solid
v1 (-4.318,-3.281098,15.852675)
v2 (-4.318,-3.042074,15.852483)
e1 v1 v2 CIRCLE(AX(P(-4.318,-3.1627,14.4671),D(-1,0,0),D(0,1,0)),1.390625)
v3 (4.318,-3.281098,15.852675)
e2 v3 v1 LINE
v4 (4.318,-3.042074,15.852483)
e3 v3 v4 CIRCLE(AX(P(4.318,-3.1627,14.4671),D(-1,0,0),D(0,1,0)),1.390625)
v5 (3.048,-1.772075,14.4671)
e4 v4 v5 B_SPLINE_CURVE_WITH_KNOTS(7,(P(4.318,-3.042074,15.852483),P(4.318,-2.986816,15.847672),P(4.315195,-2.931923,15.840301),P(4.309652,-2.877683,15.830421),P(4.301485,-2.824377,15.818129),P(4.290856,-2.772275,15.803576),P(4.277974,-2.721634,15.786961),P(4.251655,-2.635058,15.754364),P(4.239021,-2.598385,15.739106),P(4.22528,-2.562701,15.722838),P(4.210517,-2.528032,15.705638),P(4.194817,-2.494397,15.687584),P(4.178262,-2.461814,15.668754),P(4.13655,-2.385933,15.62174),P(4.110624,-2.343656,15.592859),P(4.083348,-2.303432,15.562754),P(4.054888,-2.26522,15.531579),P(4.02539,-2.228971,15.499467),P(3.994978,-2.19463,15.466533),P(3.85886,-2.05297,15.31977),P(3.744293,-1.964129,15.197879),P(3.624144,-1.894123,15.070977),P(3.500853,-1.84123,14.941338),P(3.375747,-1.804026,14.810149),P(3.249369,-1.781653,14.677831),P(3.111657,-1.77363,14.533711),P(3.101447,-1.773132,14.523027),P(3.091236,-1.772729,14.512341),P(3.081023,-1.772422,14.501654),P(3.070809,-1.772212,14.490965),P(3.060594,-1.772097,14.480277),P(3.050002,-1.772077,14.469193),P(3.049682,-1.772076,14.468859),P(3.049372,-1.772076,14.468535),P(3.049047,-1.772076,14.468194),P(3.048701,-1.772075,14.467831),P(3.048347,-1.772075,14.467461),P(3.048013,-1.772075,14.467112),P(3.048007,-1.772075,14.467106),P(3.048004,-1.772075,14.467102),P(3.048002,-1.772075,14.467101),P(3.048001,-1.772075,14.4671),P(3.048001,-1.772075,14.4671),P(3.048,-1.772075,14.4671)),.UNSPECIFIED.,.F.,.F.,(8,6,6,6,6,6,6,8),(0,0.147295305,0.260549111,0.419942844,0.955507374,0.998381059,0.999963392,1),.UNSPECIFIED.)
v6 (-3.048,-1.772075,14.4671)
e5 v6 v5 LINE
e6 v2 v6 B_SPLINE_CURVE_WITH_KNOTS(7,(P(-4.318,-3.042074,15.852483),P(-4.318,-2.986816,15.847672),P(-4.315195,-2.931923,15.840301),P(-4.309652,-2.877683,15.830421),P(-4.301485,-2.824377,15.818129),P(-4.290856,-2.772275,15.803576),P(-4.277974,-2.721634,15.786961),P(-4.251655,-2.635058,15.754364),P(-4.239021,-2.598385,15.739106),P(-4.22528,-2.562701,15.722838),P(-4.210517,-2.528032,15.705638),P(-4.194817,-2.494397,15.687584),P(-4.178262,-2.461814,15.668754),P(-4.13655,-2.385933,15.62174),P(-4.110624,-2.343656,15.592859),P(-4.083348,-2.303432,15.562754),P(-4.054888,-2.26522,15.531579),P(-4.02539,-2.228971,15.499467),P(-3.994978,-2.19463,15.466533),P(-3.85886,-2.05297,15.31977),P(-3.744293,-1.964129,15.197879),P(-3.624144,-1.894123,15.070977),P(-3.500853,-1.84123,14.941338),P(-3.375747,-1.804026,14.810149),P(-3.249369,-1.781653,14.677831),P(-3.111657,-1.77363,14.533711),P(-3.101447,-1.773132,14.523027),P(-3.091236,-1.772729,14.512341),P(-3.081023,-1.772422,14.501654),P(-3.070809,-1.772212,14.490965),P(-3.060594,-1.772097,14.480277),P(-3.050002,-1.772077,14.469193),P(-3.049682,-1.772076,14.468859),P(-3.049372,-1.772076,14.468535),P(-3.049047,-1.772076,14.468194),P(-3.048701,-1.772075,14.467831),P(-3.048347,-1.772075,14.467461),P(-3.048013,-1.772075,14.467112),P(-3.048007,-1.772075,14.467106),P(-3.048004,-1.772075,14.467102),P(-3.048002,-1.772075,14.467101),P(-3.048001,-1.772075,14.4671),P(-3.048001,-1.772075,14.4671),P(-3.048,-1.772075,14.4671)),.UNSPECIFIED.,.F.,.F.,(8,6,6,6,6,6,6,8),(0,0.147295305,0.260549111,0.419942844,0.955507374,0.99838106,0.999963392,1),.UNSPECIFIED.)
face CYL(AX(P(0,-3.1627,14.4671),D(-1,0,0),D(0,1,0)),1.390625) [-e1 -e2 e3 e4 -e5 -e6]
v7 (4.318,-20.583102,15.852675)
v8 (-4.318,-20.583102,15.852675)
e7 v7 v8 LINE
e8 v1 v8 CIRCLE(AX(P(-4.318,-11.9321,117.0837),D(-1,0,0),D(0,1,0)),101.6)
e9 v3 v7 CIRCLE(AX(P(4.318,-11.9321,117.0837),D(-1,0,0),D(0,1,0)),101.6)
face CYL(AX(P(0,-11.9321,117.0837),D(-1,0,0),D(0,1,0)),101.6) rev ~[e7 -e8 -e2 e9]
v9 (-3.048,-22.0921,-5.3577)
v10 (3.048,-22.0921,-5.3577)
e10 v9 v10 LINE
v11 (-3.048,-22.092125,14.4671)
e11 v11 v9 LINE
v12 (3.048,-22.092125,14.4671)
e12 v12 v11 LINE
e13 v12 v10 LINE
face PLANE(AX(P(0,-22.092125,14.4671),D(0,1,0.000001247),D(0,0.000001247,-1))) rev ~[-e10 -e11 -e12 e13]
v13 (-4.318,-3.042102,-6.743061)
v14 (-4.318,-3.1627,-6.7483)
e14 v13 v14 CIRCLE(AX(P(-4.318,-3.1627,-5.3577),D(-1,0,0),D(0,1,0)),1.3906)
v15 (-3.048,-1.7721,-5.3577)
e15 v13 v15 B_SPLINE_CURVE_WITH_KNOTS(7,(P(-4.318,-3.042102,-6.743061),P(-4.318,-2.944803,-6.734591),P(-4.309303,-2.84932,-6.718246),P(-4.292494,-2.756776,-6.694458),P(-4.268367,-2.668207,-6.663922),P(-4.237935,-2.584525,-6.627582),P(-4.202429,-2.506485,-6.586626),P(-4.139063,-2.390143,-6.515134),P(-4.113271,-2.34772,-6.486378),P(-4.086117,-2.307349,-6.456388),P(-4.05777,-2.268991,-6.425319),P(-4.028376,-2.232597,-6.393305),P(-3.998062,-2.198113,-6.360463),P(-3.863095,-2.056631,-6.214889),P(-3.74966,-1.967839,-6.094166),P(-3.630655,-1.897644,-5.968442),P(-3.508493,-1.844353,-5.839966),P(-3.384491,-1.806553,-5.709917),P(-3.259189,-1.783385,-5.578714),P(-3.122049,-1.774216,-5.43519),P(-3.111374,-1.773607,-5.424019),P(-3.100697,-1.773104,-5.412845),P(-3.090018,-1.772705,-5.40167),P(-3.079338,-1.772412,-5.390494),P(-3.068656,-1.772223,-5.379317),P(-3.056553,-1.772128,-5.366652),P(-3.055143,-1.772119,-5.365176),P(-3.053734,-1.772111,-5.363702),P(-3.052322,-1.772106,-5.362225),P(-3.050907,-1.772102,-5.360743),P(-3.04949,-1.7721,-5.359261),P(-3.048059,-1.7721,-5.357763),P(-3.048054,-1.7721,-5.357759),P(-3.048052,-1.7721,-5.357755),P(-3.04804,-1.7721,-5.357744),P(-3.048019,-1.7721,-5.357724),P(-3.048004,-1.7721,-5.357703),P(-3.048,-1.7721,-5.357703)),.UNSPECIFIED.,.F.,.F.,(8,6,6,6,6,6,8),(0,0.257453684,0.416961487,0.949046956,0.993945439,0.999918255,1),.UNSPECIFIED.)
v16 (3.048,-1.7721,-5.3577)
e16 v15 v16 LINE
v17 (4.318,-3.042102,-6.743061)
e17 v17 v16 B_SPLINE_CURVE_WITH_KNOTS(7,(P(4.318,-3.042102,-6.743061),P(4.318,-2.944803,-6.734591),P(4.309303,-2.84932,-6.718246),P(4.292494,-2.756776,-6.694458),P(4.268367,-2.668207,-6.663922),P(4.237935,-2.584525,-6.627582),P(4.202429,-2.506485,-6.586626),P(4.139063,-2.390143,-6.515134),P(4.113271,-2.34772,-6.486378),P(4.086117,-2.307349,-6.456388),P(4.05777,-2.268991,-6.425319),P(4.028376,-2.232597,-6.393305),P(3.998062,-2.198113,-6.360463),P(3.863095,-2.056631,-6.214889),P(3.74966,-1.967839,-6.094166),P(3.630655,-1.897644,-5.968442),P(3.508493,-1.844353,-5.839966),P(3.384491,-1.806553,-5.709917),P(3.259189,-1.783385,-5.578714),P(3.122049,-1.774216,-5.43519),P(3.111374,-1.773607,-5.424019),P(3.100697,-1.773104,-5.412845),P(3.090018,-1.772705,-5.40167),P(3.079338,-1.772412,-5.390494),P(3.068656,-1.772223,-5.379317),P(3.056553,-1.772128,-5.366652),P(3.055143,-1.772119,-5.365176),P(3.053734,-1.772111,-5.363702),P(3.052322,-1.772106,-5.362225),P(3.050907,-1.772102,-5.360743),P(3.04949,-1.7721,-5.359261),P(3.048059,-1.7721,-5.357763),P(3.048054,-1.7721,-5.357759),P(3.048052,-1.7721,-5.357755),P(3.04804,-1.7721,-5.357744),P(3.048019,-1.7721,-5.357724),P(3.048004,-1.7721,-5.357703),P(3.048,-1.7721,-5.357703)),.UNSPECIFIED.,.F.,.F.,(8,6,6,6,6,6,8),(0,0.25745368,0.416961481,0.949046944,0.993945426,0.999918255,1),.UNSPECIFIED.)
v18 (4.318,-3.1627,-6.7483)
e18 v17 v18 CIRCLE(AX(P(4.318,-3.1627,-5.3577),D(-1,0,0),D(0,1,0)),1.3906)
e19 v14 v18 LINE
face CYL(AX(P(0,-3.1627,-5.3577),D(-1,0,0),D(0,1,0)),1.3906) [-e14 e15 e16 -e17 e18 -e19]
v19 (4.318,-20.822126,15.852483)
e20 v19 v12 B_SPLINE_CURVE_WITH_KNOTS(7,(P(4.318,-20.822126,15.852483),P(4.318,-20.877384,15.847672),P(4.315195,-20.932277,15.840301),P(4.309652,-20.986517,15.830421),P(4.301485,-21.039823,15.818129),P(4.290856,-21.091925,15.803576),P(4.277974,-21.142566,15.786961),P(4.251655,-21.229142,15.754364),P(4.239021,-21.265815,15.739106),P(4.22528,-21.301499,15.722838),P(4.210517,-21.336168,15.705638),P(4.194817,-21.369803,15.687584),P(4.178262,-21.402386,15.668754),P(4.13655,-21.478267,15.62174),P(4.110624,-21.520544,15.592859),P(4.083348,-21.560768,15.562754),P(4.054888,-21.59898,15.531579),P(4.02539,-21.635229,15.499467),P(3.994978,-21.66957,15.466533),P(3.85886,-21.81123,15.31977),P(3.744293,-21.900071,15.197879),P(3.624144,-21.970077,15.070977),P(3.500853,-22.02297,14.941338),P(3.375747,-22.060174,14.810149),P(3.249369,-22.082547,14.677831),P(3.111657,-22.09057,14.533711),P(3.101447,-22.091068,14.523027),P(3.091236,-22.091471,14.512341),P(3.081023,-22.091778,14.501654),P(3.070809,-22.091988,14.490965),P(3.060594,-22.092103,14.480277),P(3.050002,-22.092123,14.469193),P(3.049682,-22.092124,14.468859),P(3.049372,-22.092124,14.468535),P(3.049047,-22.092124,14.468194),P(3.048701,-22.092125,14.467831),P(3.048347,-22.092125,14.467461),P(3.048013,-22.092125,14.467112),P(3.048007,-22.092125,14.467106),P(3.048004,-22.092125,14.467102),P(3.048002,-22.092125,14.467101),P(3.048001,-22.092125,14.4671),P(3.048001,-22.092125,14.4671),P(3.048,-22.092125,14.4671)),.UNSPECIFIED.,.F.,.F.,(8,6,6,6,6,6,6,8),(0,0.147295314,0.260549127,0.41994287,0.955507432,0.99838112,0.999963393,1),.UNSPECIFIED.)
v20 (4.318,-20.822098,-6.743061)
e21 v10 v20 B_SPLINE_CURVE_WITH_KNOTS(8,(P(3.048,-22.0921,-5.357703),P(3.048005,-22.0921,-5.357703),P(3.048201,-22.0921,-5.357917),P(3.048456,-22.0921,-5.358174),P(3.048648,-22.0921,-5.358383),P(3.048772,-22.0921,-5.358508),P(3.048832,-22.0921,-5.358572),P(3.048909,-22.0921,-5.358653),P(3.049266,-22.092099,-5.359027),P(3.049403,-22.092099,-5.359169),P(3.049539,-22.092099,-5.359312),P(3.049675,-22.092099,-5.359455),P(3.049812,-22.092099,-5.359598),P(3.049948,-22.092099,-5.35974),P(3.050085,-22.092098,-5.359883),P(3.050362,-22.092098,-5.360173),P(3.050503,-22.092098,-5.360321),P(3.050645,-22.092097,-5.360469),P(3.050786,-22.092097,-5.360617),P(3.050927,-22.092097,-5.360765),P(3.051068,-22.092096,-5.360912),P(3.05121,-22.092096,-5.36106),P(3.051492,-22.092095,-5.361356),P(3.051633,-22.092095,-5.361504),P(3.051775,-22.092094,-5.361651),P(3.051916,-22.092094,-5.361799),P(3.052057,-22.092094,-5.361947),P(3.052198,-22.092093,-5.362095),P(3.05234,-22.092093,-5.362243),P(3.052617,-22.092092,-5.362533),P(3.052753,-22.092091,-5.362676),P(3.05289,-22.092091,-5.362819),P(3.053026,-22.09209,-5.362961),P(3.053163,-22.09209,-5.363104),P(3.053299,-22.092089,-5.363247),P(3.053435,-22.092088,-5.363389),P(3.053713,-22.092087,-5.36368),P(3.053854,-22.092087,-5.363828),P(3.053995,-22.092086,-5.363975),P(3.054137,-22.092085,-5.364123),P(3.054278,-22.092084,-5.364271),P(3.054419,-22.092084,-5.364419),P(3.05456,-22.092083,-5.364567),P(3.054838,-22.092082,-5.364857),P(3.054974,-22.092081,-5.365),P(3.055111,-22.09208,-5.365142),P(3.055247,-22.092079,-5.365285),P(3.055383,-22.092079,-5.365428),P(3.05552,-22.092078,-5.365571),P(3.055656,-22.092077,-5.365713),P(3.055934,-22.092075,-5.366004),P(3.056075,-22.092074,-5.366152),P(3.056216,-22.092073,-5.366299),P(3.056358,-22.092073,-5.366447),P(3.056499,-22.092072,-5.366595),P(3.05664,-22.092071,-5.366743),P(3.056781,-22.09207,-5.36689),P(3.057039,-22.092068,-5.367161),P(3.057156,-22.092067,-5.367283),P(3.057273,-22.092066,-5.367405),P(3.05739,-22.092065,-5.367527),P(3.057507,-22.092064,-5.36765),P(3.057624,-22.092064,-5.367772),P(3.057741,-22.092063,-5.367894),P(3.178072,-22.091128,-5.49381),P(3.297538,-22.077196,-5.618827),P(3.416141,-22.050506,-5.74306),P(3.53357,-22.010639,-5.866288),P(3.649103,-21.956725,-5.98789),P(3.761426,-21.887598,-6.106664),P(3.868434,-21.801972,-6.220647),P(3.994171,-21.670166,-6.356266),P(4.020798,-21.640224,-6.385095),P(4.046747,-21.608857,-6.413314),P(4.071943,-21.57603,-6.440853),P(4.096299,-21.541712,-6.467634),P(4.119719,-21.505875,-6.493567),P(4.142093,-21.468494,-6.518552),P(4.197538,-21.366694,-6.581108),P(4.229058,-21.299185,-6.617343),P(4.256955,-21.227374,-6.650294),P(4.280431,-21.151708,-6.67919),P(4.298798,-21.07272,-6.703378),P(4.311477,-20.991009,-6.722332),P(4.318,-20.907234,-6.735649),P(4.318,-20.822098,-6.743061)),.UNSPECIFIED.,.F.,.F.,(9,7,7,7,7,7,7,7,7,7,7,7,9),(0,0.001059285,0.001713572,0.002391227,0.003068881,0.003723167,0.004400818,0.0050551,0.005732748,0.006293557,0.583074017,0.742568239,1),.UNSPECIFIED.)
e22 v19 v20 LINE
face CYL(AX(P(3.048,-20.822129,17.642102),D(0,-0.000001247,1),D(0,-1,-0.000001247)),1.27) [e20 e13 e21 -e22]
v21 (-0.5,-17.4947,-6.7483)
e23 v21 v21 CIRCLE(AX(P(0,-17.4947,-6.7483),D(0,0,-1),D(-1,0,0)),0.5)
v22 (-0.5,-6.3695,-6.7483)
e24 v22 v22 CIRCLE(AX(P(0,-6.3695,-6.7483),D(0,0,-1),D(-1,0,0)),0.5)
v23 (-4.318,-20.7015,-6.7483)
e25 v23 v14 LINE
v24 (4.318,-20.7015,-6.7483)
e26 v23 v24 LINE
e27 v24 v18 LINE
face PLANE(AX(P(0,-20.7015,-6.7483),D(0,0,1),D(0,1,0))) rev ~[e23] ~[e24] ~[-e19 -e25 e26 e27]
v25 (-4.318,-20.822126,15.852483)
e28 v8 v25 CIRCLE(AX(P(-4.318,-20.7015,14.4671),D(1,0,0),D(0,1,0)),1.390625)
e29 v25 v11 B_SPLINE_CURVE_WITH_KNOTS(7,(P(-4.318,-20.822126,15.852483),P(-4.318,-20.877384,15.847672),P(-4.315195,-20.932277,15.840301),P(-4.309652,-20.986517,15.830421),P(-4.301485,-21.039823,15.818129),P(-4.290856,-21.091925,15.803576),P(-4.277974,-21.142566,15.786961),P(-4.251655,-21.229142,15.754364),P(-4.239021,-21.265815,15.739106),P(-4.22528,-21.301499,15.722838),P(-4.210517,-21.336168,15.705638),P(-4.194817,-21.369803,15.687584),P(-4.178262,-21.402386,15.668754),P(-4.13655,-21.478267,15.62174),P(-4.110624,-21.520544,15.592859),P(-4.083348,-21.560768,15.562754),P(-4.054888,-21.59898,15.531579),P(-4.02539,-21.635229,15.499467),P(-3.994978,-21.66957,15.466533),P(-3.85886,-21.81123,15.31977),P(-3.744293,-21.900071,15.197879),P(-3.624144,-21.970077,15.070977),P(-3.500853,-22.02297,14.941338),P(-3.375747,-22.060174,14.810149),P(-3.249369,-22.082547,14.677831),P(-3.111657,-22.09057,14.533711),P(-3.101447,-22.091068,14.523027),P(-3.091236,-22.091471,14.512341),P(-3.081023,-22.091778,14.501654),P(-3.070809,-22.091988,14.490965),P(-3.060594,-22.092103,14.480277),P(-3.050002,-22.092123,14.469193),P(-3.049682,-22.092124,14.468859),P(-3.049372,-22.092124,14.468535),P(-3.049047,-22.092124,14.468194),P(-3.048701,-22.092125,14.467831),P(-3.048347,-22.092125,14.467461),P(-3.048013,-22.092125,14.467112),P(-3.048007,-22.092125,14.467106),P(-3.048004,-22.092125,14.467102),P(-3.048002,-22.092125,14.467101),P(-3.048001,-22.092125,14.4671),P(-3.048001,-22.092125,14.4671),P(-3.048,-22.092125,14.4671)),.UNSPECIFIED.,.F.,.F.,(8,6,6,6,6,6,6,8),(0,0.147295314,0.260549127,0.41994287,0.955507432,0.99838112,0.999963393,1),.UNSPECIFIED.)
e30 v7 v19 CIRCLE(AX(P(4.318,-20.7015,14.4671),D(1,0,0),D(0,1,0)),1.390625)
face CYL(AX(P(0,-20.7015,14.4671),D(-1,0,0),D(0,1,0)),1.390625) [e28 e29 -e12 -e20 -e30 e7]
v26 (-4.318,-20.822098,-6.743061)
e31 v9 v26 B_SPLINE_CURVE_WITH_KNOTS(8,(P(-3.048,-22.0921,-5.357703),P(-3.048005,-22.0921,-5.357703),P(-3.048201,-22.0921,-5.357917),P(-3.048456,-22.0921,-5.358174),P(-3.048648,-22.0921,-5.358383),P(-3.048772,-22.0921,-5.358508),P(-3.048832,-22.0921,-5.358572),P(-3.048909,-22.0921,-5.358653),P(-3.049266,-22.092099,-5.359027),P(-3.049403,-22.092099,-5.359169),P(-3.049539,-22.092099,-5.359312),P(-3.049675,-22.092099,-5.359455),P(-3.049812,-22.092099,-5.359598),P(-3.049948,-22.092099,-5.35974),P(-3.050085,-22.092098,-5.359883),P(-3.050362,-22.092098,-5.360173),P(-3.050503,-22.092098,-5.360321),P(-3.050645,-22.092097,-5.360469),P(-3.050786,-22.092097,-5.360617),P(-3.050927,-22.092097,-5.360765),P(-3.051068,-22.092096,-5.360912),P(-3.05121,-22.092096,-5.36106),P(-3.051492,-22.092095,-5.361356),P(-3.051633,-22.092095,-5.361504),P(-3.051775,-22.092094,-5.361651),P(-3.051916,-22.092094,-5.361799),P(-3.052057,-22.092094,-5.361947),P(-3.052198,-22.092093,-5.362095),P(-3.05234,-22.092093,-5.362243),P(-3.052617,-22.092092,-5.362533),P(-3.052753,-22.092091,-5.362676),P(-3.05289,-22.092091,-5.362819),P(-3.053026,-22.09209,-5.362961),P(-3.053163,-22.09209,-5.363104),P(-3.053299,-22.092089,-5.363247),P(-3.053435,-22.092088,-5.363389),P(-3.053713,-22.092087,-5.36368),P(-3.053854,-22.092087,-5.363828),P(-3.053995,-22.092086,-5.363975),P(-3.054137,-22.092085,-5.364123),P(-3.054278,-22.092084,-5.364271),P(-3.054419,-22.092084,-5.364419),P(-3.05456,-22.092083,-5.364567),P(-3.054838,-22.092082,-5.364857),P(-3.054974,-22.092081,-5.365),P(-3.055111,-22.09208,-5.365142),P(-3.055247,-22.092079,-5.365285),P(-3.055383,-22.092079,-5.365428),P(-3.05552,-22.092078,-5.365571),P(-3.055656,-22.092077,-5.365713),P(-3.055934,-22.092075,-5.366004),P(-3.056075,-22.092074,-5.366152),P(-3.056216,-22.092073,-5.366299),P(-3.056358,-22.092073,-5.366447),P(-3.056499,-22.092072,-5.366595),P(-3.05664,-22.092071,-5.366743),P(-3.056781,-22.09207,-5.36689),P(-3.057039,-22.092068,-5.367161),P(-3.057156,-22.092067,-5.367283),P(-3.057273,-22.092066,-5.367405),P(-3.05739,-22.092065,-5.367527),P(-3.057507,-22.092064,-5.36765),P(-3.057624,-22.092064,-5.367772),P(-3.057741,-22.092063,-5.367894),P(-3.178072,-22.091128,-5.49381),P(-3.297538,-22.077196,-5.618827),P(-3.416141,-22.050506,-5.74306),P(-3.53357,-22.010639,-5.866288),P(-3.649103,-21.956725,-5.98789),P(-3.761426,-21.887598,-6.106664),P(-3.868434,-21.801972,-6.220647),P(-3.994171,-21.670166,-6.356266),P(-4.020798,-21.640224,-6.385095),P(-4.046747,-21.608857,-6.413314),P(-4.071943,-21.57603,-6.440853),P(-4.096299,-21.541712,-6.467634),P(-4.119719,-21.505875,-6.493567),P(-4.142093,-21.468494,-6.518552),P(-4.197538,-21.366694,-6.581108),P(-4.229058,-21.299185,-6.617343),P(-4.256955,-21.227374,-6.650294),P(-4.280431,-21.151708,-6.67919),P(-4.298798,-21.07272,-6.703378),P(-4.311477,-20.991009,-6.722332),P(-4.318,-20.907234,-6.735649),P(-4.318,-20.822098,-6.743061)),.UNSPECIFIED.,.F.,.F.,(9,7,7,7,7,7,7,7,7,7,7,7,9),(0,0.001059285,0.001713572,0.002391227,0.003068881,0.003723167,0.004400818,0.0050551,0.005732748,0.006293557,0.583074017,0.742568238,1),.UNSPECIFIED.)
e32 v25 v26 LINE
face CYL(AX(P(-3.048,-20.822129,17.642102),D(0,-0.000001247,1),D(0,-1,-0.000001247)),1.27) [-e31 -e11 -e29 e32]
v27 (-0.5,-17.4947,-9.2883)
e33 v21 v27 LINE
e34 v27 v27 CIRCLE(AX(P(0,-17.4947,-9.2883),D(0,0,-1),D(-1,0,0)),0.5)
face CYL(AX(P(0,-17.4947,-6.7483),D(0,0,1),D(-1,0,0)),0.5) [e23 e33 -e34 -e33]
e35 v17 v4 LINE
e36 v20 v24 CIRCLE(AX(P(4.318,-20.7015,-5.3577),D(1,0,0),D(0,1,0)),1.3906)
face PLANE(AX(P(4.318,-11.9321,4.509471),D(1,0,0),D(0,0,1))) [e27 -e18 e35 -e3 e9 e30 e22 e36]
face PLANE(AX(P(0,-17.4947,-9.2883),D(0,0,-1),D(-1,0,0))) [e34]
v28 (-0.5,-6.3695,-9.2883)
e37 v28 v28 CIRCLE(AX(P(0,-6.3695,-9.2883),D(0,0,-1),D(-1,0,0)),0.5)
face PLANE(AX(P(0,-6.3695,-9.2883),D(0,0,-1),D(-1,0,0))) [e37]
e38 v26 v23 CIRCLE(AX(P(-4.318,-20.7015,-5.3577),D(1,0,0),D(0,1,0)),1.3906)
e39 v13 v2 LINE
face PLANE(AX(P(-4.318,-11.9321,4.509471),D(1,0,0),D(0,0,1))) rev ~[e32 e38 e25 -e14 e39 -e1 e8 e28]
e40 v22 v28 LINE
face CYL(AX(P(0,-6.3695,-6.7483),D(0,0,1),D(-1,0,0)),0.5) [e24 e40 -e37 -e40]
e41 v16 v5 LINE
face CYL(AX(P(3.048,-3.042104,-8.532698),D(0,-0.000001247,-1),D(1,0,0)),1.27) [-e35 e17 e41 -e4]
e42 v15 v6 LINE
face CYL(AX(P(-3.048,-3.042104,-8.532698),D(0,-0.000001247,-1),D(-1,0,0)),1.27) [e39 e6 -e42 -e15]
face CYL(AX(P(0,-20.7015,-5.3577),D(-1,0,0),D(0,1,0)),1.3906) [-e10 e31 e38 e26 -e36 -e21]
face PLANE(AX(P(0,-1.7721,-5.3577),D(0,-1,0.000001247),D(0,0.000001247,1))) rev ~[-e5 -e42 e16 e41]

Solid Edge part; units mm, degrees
sketch "Sketch1" plane through (0, 0, 0) normal (1, 0, 0) x (0, 1, 0)
  line L0 (-22.0921, 14.4671) -> (-22.0921, -5.3577)
  arc A0 (-22.0921, -5.3577) -> (-20.7015, -6.7483) centre (-20.7015, -5.3577) ccw
  line L1 (-20.7015, -6.7483) -> (-3.1627, -6.7483)
  arc A1 (-1.7721, -5.3577) -> (-3.1627, -6.7483) centre (-3.1627, -5.3577) cw
  line L2 (-1.7721, -5.3577) -> (-1.7721, 14.4671)
  arc A2 (-3.2811, 15.8527) -> (-1.7721, 14.4671) centre (-3.1627, 14.4671) cw
  arc A3 (-20.5831, 15.8527) -> (-22.0921, 14.4671) centre (-20.7015, 14.4671) ccw
  arc A4 (-3.2811, 15.8527) -> (-20.5831, 15.8527) centre (-11.9321, 117.0837) cw
extrude "Protrusion1" add sketch "Sketch1" along normal mid plane 8.636
fillet "Round_1" radius 1.27 4 edges at (4.318, -22.0921, 4.5547) (-4.318, -22.0921, 4.5547) (4.318, -1.7721, 4.5547) (-4.318, -1.7721, 4.5547)
sketch "Sketch2" plane through (0, -11.6781, -6.7483) normal (0, 0, -1) x (-1, 0, 0)
  circle A0 centre (0, 5.3086) radius 0.5
  circle A1 centre (0, -5.8166) radius 0.5
  dimension "D1" = 11.1252
extrude "ExtrudedProtrusion_2" add sketch "Sketch2" along normal blind 2.54
